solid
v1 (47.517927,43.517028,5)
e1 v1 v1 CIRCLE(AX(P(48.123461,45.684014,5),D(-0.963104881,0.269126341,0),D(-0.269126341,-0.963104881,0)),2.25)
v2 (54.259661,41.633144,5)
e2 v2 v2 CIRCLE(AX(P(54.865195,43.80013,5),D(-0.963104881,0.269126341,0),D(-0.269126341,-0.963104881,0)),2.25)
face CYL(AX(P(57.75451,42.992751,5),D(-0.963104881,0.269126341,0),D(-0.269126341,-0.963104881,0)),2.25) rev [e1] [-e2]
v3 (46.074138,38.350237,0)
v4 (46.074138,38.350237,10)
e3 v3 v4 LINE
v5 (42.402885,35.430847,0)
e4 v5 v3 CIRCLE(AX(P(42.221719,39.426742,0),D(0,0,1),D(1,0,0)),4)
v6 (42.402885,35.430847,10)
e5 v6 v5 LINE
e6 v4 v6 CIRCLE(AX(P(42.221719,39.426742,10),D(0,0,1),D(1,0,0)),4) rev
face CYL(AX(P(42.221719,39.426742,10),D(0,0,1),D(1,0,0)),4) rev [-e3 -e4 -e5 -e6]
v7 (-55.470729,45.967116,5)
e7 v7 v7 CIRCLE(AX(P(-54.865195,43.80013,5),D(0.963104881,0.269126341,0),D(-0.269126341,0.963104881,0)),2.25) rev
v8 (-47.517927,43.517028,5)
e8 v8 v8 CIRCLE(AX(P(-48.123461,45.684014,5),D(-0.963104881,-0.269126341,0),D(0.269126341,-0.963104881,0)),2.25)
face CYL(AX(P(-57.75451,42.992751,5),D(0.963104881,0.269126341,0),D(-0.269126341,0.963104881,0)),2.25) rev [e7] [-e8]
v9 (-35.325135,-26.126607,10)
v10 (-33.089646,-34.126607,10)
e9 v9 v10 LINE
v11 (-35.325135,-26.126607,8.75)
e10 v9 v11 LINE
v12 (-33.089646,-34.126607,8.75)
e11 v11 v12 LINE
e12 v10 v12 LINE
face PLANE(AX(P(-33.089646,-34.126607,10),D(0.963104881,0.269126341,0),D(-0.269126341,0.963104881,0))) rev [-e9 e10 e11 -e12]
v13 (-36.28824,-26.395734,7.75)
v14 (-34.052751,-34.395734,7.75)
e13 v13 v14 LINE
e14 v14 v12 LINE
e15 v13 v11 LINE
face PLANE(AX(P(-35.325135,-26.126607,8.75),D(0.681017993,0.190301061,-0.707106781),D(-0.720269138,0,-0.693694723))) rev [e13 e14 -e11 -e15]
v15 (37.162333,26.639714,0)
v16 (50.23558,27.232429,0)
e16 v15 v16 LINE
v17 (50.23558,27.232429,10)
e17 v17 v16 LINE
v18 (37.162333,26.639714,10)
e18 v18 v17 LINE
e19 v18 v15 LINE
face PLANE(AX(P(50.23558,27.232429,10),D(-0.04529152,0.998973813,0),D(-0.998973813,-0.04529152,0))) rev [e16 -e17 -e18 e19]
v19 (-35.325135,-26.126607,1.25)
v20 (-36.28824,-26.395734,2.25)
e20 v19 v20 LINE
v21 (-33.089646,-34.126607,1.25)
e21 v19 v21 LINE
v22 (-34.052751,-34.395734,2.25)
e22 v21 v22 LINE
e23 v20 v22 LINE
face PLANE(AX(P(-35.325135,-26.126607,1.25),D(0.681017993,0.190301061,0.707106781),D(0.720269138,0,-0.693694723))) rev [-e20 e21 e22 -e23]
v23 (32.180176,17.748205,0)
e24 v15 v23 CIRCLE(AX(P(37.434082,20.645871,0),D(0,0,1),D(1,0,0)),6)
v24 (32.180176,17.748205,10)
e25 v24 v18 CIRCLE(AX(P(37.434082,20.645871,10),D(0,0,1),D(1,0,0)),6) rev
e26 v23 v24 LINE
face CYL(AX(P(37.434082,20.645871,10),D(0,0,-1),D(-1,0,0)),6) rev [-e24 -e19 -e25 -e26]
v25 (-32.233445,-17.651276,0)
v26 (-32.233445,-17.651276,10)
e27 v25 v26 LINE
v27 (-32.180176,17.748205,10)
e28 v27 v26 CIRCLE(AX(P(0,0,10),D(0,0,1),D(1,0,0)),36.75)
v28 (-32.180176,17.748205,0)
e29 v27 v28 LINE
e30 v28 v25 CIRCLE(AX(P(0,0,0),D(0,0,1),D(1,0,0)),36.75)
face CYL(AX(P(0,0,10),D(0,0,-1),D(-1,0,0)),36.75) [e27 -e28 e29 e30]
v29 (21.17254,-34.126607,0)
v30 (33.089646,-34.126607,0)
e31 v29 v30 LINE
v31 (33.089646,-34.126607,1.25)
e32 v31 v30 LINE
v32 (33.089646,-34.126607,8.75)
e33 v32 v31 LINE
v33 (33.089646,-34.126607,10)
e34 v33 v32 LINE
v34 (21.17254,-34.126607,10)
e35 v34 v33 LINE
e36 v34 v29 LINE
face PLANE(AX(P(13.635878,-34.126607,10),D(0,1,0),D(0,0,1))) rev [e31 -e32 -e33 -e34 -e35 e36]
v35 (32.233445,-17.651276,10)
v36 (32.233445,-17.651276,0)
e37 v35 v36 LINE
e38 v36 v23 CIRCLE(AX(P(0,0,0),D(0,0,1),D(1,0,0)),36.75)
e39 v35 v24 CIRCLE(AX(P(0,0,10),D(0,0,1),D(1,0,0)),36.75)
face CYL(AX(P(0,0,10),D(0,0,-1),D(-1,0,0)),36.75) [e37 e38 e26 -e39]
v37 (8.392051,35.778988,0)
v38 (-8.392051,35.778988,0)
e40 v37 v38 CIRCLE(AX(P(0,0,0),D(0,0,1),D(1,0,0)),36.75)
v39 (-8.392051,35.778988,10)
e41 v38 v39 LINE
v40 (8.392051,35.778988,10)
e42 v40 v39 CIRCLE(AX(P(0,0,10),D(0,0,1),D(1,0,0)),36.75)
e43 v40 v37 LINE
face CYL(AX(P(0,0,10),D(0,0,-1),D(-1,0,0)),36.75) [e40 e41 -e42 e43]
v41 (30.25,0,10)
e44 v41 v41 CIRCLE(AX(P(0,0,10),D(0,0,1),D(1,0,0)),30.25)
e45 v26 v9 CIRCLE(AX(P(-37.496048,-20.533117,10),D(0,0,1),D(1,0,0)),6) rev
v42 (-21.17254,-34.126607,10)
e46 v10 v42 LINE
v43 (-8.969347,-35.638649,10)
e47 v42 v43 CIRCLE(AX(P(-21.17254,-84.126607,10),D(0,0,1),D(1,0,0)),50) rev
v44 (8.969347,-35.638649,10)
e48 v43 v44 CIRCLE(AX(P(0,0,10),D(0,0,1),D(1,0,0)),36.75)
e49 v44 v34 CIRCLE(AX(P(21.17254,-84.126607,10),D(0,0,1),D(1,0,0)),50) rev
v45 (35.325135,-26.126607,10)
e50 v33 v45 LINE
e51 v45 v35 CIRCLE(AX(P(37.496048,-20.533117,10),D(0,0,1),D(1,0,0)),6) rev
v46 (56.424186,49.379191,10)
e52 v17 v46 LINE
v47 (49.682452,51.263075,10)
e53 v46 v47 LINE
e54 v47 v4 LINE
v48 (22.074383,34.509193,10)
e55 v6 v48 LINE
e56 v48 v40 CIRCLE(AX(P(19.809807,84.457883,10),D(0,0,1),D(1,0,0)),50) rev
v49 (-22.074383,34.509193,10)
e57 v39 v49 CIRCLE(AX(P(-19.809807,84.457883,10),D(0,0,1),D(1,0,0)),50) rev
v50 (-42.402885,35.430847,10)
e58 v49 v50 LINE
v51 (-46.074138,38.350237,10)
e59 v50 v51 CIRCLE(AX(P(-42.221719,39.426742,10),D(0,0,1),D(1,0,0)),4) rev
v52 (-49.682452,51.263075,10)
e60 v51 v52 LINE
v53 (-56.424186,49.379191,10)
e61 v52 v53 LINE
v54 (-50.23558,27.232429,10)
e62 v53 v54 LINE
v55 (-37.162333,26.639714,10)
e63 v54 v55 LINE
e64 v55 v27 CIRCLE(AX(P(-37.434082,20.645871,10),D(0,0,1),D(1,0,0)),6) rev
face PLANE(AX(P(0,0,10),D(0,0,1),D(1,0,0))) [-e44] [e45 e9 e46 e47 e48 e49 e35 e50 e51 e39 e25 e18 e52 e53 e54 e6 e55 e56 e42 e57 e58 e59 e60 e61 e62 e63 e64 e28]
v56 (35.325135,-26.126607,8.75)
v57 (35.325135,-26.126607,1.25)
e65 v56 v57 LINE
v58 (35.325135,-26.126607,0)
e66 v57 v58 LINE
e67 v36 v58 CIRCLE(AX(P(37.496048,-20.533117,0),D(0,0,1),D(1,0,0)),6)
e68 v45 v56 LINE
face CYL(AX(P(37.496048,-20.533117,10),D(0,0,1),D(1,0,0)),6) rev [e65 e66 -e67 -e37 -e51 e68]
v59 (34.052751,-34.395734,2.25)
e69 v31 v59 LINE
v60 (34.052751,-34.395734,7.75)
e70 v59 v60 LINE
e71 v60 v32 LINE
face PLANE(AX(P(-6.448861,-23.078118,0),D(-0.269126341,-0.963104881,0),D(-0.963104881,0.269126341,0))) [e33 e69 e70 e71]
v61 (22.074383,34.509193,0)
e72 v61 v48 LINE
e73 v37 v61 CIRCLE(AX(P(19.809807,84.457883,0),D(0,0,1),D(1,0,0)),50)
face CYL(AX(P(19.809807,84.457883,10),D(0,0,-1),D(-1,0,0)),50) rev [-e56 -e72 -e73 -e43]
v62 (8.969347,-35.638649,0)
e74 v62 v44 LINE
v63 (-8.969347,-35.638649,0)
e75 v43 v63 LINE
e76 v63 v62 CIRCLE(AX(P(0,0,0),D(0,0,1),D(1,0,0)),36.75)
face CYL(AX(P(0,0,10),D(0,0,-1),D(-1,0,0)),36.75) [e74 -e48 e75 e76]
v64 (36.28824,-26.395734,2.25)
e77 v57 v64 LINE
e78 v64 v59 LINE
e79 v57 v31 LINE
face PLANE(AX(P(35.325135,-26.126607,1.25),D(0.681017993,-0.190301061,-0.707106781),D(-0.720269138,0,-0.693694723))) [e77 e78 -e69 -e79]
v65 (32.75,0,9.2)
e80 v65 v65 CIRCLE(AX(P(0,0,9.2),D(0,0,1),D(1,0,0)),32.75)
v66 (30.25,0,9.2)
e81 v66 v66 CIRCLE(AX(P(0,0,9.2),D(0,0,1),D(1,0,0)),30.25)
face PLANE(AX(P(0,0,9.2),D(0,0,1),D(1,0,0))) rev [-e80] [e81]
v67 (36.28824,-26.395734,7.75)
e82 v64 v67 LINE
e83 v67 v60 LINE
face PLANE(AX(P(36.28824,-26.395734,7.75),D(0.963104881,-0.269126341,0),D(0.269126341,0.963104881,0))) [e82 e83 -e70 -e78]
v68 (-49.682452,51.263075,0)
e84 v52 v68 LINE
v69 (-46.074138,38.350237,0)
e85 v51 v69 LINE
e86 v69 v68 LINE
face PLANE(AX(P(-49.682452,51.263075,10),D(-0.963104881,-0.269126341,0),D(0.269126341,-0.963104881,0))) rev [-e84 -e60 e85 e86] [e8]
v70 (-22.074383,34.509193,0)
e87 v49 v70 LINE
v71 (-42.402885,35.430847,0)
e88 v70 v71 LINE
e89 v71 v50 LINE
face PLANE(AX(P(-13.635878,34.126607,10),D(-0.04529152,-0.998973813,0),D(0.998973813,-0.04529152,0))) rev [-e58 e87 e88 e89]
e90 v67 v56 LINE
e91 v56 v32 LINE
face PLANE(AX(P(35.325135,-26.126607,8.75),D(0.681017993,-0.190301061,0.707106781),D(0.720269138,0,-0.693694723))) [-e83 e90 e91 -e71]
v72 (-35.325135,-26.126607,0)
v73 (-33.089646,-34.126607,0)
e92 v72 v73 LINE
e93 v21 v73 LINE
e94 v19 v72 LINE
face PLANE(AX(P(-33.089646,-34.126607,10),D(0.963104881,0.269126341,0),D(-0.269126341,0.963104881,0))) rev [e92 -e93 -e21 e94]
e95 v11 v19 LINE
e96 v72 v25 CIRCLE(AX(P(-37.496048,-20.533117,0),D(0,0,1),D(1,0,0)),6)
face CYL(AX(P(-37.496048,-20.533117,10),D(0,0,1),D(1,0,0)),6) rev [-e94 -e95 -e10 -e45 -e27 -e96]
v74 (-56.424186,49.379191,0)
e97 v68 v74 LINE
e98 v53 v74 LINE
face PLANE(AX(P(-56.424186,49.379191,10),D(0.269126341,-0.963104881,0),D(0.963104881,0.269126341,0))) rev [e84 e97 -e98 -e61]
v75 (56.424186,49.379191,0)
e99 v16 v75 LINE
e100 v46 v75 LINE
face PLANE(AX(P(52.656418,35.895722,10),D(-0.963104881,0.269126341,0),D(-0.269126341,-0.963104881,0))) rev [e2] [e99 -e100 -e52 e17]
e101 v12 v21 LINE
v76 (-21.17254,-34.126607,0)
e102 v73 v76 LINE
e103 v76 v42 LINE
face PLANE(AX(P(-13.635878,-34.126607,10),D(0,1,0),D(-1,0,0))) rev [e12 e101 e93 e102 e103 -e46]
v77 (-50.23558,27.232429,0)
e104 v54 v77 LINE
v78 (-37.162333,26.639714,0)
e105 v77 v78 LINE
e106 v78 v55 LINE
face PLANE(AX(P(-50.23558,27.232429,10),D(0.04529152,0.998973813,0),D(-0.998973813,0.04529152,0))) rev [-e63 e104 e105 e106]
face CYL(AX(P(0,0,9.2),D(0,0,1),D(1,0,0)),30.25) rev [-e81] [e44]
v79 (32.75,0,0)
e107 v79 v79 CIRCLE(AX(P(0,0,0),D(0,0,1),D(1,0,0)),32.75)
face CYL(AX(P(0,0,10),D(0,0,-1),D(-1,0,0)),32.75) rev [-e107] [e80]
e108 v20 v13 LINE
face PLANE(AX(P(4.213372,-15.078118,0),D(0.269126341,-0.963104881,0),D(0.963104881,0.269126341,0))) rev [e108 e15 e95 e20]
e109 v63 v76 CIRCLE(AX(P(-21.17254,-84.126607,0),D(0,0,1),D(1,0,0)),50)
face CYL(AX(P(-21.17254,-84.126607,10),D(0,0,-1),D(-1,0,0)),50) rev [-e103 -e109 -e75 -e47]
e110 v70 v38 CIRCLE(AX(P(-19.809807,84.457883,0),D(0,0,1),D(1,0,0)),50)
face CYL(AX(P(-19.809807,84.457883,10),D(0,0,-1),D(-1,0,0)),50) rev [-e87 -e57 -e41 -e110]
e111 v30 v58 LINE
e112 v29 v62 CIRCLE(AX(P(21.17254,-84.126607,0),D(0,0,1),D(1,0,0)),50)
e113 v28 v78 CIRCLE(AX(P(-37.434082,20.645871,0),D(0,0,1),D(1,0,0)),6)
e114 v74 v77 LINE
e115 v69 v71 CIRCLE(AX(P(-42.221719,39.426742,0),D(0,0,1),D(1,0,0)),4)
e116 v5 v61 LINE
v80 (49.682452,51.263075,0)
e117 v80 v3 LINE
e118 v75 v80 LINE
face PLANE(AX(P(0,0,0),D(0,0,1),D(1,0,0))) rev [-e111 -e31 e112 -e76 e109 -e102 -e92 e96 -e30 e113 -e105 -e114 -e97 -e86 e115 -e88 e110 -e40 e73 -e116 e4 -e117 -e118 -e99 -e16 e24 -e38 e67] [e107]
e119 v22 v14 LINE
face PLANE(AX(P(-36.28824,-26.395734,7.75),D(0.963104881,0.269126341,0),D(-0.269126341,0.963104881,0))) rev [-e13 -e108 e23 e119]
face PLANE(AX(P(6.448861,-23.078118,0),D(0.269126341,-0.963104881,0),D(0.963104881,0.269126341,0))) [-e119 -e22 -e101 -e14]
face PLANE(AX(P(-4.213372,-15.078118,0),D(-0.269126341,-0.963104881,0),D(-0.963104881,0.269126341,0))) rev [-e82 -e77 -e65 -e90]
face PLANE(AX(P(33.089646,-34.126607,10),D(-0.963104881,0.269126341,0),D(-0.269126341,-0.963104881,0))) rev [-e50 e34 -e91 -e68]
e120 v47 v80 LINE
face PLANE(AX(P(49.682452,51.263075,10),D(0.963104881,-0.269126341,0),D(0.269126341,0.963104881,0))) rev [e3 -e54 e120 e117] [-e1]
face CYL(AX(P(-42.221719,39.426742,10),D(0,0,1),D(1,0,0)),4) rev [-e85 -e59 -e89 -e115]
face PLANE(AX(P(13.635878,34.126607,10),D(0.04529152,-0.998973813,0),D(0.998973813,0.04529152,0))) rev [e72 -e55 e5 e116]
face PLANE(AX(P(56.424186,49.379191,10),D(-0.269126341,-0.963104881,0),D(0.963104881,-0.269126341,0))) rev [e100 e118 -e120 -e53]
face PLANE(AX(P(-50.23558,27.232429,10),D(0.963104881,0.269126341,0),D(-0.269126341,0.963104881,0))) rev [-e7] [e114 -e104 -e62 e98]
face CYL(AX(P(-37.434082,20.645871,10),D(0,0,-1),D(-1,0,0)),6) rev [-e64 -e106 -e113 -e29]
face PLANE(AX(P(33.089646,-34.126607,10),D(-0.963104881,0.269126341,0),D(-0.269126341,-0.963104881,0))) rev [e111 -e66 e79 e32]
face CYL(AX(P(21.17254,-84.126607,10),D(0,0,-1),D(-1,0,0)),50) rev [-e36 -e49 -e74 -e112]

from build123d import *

# Parameters (mm, degrees)
SKIZZE1_R                       = 32.75
AUFSATZ_LINEAR_AUSTRAGEN1_DEPTH = 10
AUFSATZ_LINEAR_START            = -0.8
SKIZZE2_R                       = 32.75
SKIZZE2_R_2                     = 30.25
AUFSATZ_LINEAR_AUSTRAGEN2_DEPTH = 0.8
SKIZZE5_R                       = 2.25
SCHNITT_LINEAR_AUSTRAGEN1_DEPTH = 10
VERRUNDUNG1_R                   = 50
VERRUNDUNG2_R                   = 6
VERRUNDUNG3_R                   = 4
AUFSATZ_LINEAR_AUSTRAGEN3_DEPTH = 8.306468


with BuildPart() as part:
    # Skizze1 → Aufsatz-Linear austragen1 (new body)
    with BuildSketch(Plane.XY):
        with BuildLine():
            Line((-13.635878322, -34.12660725), (-33.089645956, -34.12660725))
            Line((-33.089645956, -34.12660725), (-35.325135331, -26.12660725))
            Line((-35.325135331, -26.12660725), (-25.844978112, -26.12660725))
            ThreePointArc((-25.844978112, -26.12660725), (-36.75, 0), (-25.844978112, 26.12660725))
            Line((-25.844978112, 26.12660725), (-50.235580292, 27.232429468))
            Line((-50.235580292, 27.232429468), (-52.656417654, 35.895722216))
            Line((-52.656417654, 35.895722216), (-56.424186432, 49.379190555))
            Line((-56.424186432, 49.379190555), (-49.682452262, 51.263074944))
            Line((-49.682452262, 51.263074944), (-45.294995525, 35.561969729))
            Line((-45.294995525, 35.561969729), (-13.635878322, 34.12660725))
            ThreePointArc((-13.635878322, 34.12660725), (0, 36.75), (13.635878322, 34.12660725))
            Line((13.635878322, 34.12660725), (45.294995525, 35.561969729))
            Line((45.294995525, 35.561969729), (49.682452262, 51.263074944))
            Line((49.682452262, 51.263074944), (56.424186432, 49.379190555))
            Line((56.424186432, 49.379190555), (52.656417654, 35.895722216))
            Line((52.656417654, 35.895722216), (50.235580292, 27.232429468))
            Line((50.235580292, 27.232429468), (25.844978112, 26.12660725))
            ThreePointArc((25.844978112, 26.12660725), (36.75, 0), (25.844978112, -26.12660725))
            Line((25.844978112, -26.12660725), (35.325135331, -26.12660725))
            Line((35.325135331, -26.12660725), (33.089645956, -34.12660725))
            Line((33.089645956, -34.12660725), (13.635878322, -34.12660725))
            ThreePointArc((13.635878322, -34.12660725), (0, -36.75), (-13.635878322, -34.12660725))
        make_face()
        Circle(SKIZZE1_R, mode=Mode.SUBTRACT)
    extrude(amount=AUFSATZ_LINEAR_AUSTRAGEN1_DEPTH)

    # Skizze2 → Aufsatz-Linear austragen2 (add)
    with BuildSketch(Plane.XY.offset(10).offset(AUFSATZ_LINEAR_START)):
        Circle(SKIZZE2_R)
        Circle(SKIZZE2_R_2, mode=Mode.SUBTRACT)
    extrude(amount=AUFSATZ_LINEAR_AUSTRAGEN2_DEPTH)

    # Skizze5 → Schnitt-Linear austragen1 (cut)
    with BuildSketch(Plane(origin=(32.796772797, -9.164604643, 0), x_dir=(0, 0, 1), z_dir=(-0.9631048813334842, 0.2691263412444341, 0))):
        with Locations(Location((5, 56.94978804, 0), (0, 0, 270))):
            Circle(SKIZZE5_R)
    schnitt_linear_austragen1 = extrude(amount=-SCHNITT_LINEAR_AUSTRAGEN1_DEPTH, mode=Mode.SUBTRACT)

    # Spiegeln1: Schnitt-Linear austragen1 across plane
    add(schnitt_linear_austragen1.mirror(Plane(origin=(0, 0, 0), x_dir=(0, 0, 1), z_dir=(1, 0, 0))), mode=Mode.SUBTRACT)

    # Verrundung1
    verrundung1_edges = [part.edges().sort_by_distance(p)[0] for p in [
        (13.635878322, 34.12660725, 5),
        (13.635878322, -34.12660725, 5),
        (-13.635878322, -34.12660725, 5),
        (-13.635878322, 34.12660725, 5),
    ]]
    fillet(verrundung1_edges, radius=VERRUNDUNG1_R)

    # Verrundung2
    # the kernel refuses this fillet: 6 mm, written as the material it adds along each edge
    with BuildSketch(Plane(origin=(-25.844978112, -26.12660725, 0), x_dir=(-1, 0, 0), z_dir=(0, 0, 1))) as verrundung2_piece_1:
        with BuildLine():
            CenterArc((11.651069987, -5.593490659), VERRUNDUNG2_R, 111.211936516, 97.493506366)
            Line((6.388466745, -8.475331584), (6.283214681, -8.532968403))
            ThreePointArc((6.283214681, -8.532968403), (3.405977683, -4.078058883), (-0.084391765, -0.085311371))
            Line((-0.084391765, -0.085311371), (0, 0.12))
            ThreePointArc((0, 0.12), (4.74007861, 0.12), (9.436738964, 0.111869813))
            Line((9.436738964, 0.111869813), (9.48015722, 0))
        make_face()
    extrude(amount=10)
    with BuildSketch(Plane(origin=(25.844978112, -26.12660725, 0), x_dir=(1, 0, 0), z_dir=(0, 0, 1))) as verrundung2_piece_2:
        with BuildLine():
            CenterArc((11.651069987, 5.593490659), VERRUNDUNG2_R, 151.294557118, 97.493506366)
            Line((6.388466745, 8.475331584), (6.283214681, 8.532968403))
            ThreePointArc((6.283214681, 8.532968403), (3.405977683, 4.078058883), (-0.084391765, 0.085311371))
            Line((-0.084391765, 0.085311371), (0, -0.12))
            ThreePointArc((0, -0.12), (4.74007861, -0.12), (9.436738964, -0.111869813))
            Line((9.436738964, -0.111869813), (9.48015722, 0))
        make_face()
    extrude(amount=10)
    with BuildSketch(Plane(origin=(25.844978112, 26.12660725, 0), x_dir=(0.603126946859045, -0.7976452130944475, 0), z_dir=(0, 0, 1))) as verrundung2_piece_3:
        with BuildLine():
            CenterArc((11.361383868, 5.938413704), VERRUNDUNG2_R, 145.501722428, 116.281978681)
            Line((6.416524574, 9.336702474), (6.317627388, 9.40466825))
            Line((6.317627388, 9.40466825), (-0.098897186, 0.067965775))
            Line((-0.098897186, 0.067965775), (0.017149259, -0.118768274))
            ThreePointArc((0.017149259, -0.118768274), (5.251960467, 0.257216064), (10.486771676, -0.118768274))
            Line((10.486771676, -0.118768274), (10.503920934, 0))
        make_face()
    extrude(amount=10)
    with BuildSketch(Plane(origin=(-25.844978112, 26.12660725, 0), x_dir=(-0.6031269468590452, -0.7976452130944475, 0), z_dir=(0, 0, 1))) as verrundung2_piece_4:
        with BuildLine():
            CenterArc((11.361383868, -5.938413704), VERRUNDUNG2_R, 98.216298891, 116.281978681)
            Line((6.416524574, -9.336702474), (6.317627388, -9.40466825))
            Line((6.317627388, -9.40466825), (-0.098897186, -0.067965775))
            Line((-0.098897186, -0.067965775), (0.017149259, 0.118768274))
            ThreePointArc((0.017149259, 0.118768274), (5.251960467, -0.257216064), (10.486771676, 0.118768274))
            Line((10.486771676, 0.118768274), (10.503920934, 0))
        make_face()
    extrude(amount=10)

    # Verrundung3
    verrundung3_edges = [part.edges().sort_by_distance(p)[0] for p in [
        (45.294995525, 35.561969729, 5),
        (-45.294995525, 35.561969729, 5),
    ]]
    fillet(verrundung3_edges, radius=VERRUNDUNG3_R)

    # Skizze6 → Aufsatz-Linear austragen3 (add)
    with BuildSketch(Plane(origin=(6.448861011, -23.078118218, 0), x_dir=(0, 0, -1), z_dir=(-0.26912634124443396, 0.9631048813334842, 0))):
        Polygon((-8.75, 41.05316849), (-7.75, 42.05316849), (-2.25, 42.05316849), (-1.25, 41.05316849), align=None)
    aufsatz_linear_austragen3 = extrude(amount=AUFSATZ_LINEAR_AUSTRAGEN3_DEPTH)

    # Spiegeln2: Aufsatz-Linear austragen3 across plane
    add(aufsatz_linear_austragen3.mirror(Plane(origin=(0, 0, 0), x_dir=(0, 0, 1), z_dir=(1, 0, 0))))


solid = part.part
